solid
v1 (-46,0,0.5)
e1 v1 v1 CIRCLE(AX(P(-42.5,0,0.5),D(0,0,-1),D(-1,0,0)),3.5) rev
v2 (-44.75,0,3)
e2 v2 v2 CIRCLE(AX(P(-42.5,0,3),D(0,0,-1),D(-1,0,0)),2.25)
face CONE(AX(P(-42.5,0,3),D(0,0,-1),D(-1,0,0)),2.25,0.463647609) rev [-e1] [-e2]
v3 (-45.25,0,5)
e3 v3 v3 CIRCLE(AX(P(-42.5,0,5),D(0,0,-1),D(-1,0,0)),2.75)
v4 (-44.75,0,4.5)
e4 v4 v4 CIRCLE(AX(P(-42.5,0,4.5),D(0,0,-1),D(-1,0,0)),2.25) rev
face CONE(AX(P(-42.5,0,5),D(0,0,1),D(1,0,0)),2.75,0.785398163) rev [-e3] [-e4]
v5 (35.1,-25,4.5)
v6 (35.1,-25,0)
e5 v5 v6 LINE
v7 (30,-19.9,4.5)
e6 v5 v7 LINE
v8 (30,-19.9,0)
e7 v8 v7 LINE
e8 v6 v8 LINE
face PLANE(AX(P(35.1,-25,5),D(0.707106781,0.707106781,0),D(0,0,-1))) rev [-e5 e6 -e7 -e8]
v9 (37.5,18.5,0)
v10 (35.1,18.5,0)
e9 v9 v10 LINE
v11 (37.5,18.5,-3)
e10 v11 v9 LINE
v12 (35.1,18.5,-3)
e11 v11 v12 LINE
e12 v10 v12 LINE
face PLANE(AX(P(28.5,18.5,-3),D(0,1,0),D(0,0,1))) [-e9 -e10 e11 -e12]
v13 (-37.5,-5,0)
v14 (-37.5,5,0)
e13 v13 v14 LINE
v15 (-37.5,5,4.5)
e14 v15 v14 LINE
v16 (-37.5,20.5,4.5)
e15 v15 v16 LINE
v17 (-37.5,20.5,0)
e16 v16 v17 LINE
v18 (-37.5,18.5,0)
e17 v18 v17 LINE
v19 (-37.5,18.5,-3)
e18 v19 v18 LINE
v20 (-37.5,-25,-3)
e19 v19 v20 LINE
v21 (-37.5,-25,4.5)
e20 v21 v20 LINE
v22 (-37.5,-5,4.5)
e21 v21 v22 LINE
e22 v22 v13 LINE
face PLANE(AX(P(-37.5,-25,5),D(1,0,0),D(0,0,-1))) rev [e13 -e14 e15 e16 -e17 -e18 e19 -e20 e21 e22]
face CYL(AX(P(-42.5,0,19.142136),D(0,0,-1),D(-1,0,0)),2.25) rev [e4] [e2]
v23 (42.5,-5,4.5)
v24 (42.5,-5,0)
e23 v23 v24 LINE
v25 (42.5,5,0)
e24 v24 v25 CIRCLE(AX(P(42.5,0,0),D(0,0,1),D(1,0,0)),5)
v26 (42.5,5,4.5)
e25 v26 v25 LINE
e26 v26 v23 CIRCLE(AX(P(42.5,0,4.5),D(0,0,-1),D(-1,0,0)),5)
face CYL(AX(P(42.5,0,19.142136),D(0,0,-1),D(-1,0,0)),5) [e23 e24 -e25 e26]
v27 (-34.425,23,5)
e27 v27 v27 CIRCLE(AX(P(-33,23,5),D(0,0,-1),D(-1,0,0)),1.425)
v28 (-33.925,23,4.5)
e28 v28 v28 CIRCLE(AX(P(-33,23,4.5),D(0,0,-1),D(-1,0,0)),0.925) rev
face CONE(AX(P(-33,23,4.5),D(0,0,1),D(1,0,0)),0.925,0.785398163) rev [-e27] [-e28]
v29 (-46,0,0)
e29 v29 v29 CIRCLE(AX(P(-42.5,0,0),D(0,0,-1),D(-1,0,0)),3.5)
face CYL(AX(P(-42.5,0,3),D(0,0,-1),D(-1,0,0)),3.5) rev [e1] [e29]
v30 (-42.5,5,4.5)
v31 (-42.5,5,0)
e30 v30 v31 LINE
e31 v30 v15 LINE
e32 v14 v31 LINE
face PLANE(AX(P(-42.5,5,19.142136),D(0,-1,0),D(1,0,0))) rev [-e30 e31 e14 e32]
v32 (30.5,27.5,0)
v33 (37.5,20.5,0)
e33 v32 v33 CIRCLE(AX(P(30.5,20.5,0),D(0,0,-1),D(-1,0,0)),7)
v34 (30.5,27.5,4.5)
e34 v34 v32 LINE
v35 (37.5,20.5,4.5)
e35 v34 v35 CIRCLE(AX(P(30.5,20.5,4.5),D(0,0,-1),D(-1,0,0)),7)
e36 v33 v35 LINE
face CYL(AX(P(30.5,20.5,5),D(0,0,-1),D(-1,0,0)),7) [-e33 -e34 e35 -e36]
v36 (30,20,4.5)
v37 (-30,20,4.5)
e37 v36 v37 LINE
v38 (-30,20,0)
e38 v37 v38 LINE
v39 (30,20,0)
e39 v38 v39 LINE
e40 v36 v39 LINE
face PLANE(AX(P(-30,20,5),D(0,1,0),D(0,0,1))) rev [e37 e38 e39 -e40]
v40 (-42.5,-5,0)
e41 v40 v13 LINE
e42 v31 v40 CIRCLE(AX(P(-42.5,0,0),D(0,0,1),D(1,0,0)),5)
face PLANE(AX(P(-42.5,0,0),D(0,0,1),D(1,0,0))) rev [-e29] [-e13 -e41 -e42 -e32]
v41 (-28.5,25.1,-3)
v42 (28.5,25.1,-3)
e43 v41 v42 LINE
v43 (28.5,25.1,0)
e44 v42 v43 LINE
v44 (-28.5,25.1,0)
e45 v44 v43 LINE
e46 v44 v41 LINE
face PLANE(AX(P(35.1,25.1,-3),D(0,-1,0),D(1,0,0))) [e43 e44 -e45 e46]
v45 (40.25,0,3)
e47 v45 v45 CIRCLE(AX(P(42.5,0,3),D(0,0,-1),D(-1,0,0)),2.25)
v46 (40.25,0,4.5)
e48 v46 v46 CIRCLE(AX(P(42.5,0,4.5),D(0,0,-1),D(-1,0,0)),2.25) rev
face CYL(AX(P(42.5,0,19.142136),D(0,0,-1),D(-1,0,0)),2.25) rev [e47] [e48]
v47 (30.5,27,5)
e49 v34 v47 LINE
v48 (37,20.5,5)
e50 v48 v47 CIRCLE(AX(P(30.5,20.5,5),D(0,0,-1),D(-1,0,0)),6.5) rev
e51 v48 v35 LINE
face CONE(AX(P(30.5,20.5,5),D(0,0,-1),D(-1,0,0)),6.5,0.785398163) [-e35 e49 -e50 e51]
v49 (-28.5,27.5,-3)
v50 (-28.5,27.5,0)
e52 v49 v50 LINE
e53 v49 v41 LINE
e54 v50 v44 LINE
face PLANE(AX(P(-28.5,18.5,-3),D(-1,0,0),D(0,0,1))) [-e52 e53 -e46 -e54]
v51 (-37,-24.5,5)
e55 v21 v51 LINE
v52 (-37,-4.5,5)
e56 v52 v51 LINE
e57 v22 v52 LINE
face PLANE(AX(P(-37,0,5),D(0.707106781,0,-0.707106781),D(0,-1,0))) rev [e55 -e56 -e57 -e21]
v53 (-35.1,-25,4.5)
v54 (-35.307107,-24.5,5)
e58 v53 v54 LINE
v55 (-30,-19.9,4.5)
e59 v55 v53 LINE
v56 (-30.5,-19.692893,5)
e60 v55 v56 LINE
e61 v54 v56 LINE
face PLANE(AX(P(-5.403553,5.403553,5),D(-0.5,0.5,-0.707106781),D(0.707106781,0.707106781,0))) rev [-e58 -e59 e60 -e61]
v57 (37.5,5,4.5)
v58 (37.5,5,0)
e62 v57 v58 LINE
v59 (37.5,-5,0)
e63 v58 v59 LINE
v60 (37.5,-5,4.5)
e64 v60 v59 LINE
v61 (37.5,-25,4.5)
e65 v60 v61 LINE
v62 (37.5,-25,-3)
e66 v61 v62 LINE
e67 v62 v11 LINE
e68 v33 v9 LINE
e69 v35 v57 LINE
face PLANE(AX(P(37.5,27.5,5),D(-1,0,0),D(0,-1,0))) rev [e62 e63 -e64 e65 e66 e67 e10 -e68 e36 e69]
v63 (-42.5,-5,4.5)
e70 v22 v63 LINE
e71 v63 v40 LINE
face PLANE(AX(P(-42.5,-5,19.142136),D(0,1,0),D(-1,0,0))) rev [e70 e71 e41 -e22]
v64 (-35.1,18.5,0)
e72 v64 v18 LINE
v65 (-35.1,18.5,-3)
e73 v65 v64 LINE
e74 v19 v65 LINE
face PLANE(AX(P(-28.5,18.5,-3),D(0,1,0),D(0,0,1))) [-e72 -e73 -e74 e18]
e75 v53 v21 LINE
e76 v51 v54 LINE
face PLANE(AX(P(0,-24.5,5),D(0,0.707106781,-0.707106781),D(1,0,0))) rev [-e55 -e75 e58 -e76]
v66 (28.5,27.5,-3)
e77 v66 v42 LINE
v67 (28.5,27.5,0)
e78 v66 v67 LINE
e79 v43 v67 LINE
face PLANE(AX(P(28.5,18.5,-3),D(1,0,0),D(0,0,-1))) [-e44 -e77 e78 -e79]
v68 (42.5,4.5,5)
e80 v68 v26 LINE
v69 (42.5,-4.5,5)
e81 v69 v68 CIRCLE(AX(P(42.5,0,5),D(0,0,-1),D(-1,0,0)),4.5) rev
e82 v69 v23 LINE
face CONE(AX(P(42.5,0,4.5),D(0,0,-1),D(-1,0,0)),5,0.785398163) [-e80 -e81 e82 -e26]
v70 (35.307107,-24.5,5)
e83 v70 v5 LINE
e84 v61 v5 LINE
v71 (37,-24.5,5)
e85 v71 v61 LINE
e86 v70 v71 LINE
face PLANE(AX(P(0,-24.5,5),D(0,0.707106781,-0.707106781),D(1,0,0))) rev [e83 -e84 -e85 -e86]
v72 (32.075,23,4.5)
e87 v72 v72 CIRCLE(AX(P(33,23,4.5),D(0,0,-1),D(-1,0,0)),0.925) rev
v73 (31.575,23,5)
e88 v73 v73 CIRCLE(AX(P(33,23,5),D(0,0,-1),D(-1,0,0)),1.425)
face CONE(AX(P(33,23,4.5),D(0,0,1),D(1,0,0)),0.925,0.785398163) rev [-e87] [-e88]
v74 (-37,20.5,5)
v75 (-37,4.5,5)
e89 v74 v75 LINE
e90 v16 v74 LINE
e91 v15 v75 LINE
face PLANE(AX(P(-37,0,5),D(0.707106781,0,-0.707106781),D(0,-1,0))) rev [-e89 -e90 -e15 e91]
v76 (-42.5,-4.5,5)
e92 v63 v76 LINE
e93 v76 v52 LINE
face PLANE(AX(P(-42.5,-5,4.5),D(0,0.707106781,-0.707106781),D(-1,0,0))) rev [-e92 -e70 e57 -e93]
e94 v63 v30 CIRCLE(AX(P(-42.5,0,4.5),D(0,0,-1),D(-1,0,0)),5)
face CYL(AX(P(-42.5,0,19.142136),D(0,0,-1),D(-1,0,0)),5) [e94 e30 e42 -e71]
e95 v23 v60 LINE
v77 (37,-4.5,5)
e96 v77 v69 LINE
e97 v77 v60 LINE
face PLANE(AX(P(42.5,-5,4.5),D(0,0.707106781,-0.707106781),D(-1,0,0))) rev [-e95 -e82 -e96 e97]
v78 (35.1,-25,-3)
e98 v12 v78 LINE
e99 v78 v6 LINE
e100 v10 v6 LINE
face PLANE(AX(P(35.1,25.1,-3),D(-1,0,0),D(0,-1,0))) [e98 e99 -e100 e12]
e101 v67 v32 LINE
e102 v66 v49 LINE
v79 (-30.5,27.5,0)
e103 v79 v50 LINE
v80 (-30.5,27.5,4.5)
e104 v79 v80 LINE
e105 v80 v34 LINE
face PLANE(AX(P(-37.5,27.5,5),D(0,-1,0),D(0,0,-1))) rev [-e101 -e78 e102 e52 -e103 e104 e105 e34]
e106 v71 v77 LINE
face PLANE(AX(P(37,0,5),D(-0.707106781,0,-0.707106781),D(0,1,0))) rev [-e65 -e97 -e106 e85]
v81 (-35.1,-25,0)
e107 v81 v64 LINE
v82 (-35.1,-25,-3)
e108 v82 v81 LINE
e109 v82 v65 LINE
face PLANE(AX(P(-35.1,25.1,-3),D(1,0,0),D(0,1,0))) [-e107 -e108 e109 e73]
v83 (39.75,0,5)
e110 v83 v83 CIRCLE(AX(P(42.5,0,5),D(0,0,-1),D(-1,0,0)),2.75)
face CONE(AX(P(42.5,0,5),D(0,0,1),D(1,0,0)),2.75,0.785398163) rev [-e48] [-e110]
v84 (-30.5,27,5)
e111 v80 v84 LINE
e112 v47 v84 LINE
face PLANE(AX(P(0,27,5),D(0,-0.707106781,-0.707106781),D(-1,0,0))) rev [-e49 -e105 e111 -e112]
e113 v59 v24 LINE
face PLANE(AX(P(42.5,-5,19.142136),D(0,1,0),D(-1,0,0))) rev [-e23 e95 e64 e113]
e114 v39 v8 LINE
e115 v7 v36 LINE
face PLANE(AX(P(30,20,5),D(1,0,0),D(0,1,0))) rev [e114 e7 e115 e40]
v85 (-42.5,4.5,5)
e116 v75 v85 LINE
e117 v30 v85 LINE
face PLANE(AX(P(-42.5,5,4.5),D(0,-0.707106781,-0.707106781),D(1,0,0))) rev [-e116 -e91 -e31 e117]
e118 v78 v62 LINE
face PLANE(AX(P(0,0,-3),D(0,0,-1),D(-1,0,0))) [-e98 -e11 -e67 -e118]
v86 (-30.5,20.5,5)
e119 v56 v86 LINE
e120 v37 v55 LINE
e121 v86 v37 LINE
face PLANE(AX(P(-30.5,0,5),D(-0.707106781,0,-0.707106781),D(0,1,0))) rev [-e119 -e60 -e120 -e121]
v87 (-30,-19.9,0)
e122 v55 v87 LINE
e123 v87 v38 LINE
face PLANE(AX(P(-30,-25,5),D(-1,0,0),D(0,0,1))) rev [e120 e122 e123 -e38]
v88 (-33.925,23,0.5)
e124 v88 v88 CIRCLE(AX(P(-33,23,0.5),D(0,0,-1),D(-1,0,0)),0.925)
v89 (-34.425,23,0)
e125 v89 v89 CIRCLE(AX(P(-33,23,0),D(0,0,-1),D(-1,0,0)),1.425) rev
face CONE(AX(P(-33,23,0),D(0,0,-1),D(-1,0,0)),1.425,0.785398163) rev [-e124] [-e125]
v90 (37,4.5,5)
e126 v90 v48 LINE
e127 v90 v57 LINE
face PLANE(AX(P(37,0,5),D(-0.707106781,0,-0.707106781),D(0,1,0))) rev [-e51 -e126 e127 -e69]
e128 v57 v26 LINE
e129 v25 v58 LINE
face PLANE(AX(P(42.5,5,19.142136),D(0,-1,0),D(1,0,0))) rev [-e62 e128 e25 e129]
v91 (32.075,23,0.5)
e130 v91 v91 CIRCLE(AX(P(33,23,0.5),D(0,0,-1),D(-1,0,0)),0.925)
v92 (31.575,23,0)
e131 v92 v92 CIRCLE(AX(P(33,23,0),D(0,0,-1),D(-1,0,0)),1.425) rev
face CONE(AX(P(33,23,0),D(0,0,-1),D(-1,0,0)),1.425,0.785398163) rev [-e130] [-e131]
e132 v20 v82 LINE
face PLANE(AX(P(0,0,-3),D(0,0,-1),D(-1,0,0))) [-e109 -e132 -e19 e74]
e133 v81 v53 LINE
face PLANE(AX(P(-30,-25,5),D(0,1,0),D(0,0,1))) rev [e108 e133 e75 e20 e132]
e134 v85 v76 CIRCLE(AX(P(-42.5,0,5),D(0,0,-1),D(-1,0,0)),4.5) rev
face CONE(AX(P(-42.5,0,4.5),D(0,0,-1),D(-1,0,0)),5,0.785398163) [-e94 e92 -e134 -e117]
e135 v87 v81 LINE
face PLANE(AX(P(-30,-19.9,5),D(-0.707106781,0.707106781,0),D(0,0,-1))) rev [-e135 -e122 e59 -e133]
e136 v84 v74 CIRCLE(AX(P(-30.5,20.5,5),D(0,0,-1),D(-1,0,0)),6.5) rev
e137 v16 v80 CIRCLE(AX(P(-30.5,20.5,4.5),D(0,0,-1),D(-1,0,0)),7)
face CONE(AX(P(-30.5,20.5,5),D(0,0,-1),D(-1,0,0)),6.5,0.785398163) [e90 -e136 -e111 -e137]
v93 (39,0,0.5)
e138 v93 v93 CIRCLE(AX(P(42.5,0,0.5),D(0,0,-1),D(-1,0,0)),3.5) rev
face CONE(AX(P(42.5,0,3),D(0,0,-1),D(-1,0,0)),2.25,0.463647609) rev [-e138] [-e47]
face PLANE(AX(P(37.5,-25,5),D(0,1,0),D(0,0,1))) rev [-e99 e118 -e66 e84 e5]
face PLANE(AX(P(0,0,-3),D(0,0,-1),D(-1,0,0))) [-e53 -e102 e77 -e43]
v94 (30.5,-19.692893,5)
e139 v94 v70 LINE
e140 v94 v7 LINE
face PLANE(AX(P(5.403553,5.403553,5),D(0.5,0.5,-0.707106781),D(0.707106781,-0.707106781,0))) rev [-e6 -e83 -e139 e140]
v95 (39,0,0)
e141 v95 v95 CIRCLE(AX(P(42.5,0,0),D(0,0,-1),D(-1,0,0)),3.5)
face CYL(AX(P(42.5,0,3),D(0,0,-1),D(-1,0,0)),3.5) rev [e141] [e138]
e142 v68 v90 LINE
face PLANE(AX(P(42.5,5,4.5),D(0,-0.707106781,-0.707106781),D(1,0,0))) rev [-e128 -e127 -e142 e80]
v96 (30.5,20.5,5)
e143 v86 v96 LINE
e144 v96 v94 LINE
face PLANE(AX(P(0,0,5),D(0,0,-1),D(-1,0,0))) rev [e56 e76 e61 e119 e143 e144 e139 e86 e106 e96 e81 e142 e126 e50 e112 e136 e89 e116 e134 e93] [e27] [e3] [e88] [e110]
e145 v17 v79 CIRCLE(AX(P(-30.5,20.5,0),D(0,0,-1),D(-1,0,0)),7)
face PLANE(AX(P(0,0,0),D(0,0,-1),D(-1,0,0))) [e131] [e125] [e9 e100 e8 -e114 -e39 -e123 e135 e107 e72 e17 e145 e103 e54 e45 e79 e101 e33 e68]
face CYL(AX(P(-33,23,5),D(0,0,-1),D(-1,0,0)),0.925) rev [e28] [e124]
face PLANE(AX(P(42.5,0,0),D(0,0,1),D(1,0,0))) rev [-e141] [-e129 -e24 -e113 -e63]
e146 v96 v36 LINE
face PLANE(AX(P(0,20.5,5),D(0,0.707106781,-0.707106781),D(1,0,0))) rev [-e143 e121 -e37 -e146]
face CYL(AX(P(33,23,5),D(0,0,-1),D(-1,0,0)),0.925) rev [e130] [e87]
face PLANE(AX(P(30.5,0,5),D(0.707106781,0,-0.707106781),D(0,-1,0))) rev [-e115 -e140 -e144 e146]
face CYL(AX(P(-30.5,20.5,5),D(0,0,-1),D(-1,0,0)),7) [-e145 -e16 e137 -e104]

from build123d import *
from OCP.BRepFilletAPI import BRepFilletAPI_MakeChamfer

# Parameters (mm, degrees)
SKETCH1_R           = 0.925
BOSS_EXTRUDE1_DEPTH = 5
BOSS_EXTRUDE2_DEPTH = 3
SKETCH7_W           = 9
SKETCH7_H           = 9
CUT_EXTRUDE3_DEPTH  = 47.770717335
SKETCH3_R           = 2.25
BOSS_EXTRUDE3_DEPTH = 5
SKETCH4_R           = 3.5
CUT_EXTRUDE1_DEPTH  = 3
CHAMFER2_SIZE       = 5.1
FILLET1_R           = 7
CHAMFER3_SIZE       = 0.5
CHAMFER1_SIZE       = 1.25
CHAMFER1_SIZE_2     = 2.5


with BuildPart() as part:
    # Sketch1 → Boss-Extrude1 (new body)
    with BuildSketch(Plane.XY):
        Polygon((-30, -25), (-30, 20), (30, 20), (30, -25), (37.5, -25), (37.5, 27.5), (-37.5, 27.5), (-37.5, -25), align=None)
        with Locations((-33, 23)):
            Circle(SKETCH1_R, mode=Mode.SUBTRACT)
        with Locations((33, 23)):
            Circle(SKETCH1_R, mode=Mode.SUBTRACT)
    extrude(amount=BOSS_EXTRUDE1_DEPTH)

    # Sketch2 → Boss-Extrude2 (add)
    with BuildSketch(Plane.XY):
        Polygon((37.5, 27.5), (30, 27.5), (-30, 27.5), (-37.5, 27.5), (-37.5, -25), (-35.1, -25), (-35.1, 25.1), (35.1, 25.1), (35.1, -25), (37.5, -25), align=None)
    extrude(amount=-BOSS_EXTRUDE2_DEPTH)

    # Sketch7 → Cut-Extrude3 (cut, through all)
    with BuildSketch(Plane(origin=(0, 0, 0), x_dir=(-1, 0, 0), z_dir=(0, 0, -1))):
        with Locations((-33, 23)):
            Rectangle(SKETCH7_W, SKETCH7_H)
        with Locations((33, 23)):
            Rectangle(SKETCH7_W, SKETCH7_H)
    extrude(amount=CUT_EXTRUDE3_DEPTH, mode=Mode.SUBTRACT)

    # Sketch3 → Boss-Extrude3 (add)
    # profile 1 of 2: a face of its own
    with BuildSketch(Plane.XY):
        with BuildLine():
            Line((42.5, 5), (37.5, 5))
            Line((37.5, 5), (37.5, -5))
            Line((37.5, -5), (42.5, -5))
            ThreePointArc((42.5, -5), (47.5, 0), (42.5, 5))
        make_face()
        with Locations(Location((42.5, 0, 0), (0, 0, 180))):
            Circle(SKETCH3_R, mode=Mode.SUBTRACT)
    # profile 2 of 2: a face of its own
    with BuildSketch(Plane.XY):
        with BuildLine():
            Line((-42.5, 5), (-37.5, 5))
            Line((-37.5, 5), (-37.5, -5))
            Line((-37.5, -5), (-42.5, -5))
            ThreePointArc((-42.5, -5), (-47.5, 0), (-42.5, 5))
        make_face()
        with Locations(Location((-42.5, 0, 0), (0, 0, 180))):
            Circle(SKETCH3_R, mode=Mode.SUBTRACT)
    extrude(amount=BOSS_EXTRUDE3_DEPTH)

    # Sketch4 → Cut-Extrude1 (cut)
    with BuildSketch(Plane(origin=(0, 0, 0), x_dir=(-1, 0, 0), z_dir=(0, 0, -1))):
        with Locations((-42.5, 0)):
            Circle(SKETCH4_R)
        with Locations((42.5, 0)):
            Circle(SKETCH4_R)
    extrude(amount=-CUT_EXTRUDE1_DEPTH, mode=Mode.SUBTRACT)

    # Chamfer2
    chamfer2_edges = [part.edges().sort_by_distance(p)[0] for p in [
        (-30, -25, 2.5),
        (30, -25, 2.5),
    ]]
    chamfer(chamfer2_edges, length=CHAMFER2_SIZE)

    # Fillet1
    fillet1_edges = [part.edges().sort_by_distance(p)[0] for p in [
        (-37.5, 27.5, 2.5),
        (37.5, 27.5, 2.5),
    ]]
    fillet(fillet1_edges, radius=FILLET1_R)

    # Chamfer3
    chamfer3_edges = [part.edges().sort_by_distance(p)[0] for p in [
        (37.5, 12.75, 5),
        (47.5, 0, 5),
        (40, 5, 5),
        (40, -5, 5),
        (44.75, 0, 5),
        (-37.5, -15, 5),
        (-47.5, 0, 5),
        (-40, -5, 5),
        (-40, 5, 5),
        (-40.25, 0, 5),
        (0, 20, 5),
        (-30, 0.05, 5),
        (36.3, -25, 5),
        (32.55, -22.45, 5),
        (-32.55, -22.45, 5),
        (-37.5, 12.75, 5),
        (0, 27.5, 5),
        (35.449747468, 25.449747468, 5),
        (-35.449747468, 25.449747468, 5),
        (30, 0.05, 5),
        (-33.925, 23, 0),
        (-33.925, 23, 5),
        (37.5, -15, 5),
        (32.075, 23, 0),
        (32.075, 23, 5),
        (-36.3, -25, 5),
    ]]
    chamfer(chamfer3_edges, length=CHAMFER3_SIZE)

    # Chamfer1
    chamfer1_edges_1 = [part.edges().sort_by_distance(p)[0] for p in [
        (46, 0, 3),
    ]]
    chamfer1_side_1 = [part.faces().sort_by_distance(p)[0] for p in [
        (45.975, 0, 3),
    ]]
    chamfer1_edges_2 = [part.edges().sort_by_distance(p)[0] for p in [
        (-39, 0, 3),
    ]]
    chamfer1_side_2 = [part.faces().sort_by_distance(p)[0] for p in [
        (-39.025, 0, 3),
    ]]
    chamfer1 = BRepFilletAPI_MakeChamfer(part.part.solid().wrapped)
    for e in chamfer1_edges_1:
        chamfer1.Add(CHAMFER1_SIZE - 0.0001, CHAMFER1_SIZE_2 - 0.0001, e.wrapped, chamfer1_side_1[0].wrapped)
    for e in chamfer1_edges_2:
        chamfer1.Add(CHAMFER1_SIZE - 0.0001, CHAMFER1_SIZE_2 - 0.0001, e.wrapped, chamfer1_side_2[0].wrapped)
    add(Compound.cast(chamfer1.Shape()), mode=Mode.REPLACE)  # a hair under: the kernel refuses the full size


solid = part.part
